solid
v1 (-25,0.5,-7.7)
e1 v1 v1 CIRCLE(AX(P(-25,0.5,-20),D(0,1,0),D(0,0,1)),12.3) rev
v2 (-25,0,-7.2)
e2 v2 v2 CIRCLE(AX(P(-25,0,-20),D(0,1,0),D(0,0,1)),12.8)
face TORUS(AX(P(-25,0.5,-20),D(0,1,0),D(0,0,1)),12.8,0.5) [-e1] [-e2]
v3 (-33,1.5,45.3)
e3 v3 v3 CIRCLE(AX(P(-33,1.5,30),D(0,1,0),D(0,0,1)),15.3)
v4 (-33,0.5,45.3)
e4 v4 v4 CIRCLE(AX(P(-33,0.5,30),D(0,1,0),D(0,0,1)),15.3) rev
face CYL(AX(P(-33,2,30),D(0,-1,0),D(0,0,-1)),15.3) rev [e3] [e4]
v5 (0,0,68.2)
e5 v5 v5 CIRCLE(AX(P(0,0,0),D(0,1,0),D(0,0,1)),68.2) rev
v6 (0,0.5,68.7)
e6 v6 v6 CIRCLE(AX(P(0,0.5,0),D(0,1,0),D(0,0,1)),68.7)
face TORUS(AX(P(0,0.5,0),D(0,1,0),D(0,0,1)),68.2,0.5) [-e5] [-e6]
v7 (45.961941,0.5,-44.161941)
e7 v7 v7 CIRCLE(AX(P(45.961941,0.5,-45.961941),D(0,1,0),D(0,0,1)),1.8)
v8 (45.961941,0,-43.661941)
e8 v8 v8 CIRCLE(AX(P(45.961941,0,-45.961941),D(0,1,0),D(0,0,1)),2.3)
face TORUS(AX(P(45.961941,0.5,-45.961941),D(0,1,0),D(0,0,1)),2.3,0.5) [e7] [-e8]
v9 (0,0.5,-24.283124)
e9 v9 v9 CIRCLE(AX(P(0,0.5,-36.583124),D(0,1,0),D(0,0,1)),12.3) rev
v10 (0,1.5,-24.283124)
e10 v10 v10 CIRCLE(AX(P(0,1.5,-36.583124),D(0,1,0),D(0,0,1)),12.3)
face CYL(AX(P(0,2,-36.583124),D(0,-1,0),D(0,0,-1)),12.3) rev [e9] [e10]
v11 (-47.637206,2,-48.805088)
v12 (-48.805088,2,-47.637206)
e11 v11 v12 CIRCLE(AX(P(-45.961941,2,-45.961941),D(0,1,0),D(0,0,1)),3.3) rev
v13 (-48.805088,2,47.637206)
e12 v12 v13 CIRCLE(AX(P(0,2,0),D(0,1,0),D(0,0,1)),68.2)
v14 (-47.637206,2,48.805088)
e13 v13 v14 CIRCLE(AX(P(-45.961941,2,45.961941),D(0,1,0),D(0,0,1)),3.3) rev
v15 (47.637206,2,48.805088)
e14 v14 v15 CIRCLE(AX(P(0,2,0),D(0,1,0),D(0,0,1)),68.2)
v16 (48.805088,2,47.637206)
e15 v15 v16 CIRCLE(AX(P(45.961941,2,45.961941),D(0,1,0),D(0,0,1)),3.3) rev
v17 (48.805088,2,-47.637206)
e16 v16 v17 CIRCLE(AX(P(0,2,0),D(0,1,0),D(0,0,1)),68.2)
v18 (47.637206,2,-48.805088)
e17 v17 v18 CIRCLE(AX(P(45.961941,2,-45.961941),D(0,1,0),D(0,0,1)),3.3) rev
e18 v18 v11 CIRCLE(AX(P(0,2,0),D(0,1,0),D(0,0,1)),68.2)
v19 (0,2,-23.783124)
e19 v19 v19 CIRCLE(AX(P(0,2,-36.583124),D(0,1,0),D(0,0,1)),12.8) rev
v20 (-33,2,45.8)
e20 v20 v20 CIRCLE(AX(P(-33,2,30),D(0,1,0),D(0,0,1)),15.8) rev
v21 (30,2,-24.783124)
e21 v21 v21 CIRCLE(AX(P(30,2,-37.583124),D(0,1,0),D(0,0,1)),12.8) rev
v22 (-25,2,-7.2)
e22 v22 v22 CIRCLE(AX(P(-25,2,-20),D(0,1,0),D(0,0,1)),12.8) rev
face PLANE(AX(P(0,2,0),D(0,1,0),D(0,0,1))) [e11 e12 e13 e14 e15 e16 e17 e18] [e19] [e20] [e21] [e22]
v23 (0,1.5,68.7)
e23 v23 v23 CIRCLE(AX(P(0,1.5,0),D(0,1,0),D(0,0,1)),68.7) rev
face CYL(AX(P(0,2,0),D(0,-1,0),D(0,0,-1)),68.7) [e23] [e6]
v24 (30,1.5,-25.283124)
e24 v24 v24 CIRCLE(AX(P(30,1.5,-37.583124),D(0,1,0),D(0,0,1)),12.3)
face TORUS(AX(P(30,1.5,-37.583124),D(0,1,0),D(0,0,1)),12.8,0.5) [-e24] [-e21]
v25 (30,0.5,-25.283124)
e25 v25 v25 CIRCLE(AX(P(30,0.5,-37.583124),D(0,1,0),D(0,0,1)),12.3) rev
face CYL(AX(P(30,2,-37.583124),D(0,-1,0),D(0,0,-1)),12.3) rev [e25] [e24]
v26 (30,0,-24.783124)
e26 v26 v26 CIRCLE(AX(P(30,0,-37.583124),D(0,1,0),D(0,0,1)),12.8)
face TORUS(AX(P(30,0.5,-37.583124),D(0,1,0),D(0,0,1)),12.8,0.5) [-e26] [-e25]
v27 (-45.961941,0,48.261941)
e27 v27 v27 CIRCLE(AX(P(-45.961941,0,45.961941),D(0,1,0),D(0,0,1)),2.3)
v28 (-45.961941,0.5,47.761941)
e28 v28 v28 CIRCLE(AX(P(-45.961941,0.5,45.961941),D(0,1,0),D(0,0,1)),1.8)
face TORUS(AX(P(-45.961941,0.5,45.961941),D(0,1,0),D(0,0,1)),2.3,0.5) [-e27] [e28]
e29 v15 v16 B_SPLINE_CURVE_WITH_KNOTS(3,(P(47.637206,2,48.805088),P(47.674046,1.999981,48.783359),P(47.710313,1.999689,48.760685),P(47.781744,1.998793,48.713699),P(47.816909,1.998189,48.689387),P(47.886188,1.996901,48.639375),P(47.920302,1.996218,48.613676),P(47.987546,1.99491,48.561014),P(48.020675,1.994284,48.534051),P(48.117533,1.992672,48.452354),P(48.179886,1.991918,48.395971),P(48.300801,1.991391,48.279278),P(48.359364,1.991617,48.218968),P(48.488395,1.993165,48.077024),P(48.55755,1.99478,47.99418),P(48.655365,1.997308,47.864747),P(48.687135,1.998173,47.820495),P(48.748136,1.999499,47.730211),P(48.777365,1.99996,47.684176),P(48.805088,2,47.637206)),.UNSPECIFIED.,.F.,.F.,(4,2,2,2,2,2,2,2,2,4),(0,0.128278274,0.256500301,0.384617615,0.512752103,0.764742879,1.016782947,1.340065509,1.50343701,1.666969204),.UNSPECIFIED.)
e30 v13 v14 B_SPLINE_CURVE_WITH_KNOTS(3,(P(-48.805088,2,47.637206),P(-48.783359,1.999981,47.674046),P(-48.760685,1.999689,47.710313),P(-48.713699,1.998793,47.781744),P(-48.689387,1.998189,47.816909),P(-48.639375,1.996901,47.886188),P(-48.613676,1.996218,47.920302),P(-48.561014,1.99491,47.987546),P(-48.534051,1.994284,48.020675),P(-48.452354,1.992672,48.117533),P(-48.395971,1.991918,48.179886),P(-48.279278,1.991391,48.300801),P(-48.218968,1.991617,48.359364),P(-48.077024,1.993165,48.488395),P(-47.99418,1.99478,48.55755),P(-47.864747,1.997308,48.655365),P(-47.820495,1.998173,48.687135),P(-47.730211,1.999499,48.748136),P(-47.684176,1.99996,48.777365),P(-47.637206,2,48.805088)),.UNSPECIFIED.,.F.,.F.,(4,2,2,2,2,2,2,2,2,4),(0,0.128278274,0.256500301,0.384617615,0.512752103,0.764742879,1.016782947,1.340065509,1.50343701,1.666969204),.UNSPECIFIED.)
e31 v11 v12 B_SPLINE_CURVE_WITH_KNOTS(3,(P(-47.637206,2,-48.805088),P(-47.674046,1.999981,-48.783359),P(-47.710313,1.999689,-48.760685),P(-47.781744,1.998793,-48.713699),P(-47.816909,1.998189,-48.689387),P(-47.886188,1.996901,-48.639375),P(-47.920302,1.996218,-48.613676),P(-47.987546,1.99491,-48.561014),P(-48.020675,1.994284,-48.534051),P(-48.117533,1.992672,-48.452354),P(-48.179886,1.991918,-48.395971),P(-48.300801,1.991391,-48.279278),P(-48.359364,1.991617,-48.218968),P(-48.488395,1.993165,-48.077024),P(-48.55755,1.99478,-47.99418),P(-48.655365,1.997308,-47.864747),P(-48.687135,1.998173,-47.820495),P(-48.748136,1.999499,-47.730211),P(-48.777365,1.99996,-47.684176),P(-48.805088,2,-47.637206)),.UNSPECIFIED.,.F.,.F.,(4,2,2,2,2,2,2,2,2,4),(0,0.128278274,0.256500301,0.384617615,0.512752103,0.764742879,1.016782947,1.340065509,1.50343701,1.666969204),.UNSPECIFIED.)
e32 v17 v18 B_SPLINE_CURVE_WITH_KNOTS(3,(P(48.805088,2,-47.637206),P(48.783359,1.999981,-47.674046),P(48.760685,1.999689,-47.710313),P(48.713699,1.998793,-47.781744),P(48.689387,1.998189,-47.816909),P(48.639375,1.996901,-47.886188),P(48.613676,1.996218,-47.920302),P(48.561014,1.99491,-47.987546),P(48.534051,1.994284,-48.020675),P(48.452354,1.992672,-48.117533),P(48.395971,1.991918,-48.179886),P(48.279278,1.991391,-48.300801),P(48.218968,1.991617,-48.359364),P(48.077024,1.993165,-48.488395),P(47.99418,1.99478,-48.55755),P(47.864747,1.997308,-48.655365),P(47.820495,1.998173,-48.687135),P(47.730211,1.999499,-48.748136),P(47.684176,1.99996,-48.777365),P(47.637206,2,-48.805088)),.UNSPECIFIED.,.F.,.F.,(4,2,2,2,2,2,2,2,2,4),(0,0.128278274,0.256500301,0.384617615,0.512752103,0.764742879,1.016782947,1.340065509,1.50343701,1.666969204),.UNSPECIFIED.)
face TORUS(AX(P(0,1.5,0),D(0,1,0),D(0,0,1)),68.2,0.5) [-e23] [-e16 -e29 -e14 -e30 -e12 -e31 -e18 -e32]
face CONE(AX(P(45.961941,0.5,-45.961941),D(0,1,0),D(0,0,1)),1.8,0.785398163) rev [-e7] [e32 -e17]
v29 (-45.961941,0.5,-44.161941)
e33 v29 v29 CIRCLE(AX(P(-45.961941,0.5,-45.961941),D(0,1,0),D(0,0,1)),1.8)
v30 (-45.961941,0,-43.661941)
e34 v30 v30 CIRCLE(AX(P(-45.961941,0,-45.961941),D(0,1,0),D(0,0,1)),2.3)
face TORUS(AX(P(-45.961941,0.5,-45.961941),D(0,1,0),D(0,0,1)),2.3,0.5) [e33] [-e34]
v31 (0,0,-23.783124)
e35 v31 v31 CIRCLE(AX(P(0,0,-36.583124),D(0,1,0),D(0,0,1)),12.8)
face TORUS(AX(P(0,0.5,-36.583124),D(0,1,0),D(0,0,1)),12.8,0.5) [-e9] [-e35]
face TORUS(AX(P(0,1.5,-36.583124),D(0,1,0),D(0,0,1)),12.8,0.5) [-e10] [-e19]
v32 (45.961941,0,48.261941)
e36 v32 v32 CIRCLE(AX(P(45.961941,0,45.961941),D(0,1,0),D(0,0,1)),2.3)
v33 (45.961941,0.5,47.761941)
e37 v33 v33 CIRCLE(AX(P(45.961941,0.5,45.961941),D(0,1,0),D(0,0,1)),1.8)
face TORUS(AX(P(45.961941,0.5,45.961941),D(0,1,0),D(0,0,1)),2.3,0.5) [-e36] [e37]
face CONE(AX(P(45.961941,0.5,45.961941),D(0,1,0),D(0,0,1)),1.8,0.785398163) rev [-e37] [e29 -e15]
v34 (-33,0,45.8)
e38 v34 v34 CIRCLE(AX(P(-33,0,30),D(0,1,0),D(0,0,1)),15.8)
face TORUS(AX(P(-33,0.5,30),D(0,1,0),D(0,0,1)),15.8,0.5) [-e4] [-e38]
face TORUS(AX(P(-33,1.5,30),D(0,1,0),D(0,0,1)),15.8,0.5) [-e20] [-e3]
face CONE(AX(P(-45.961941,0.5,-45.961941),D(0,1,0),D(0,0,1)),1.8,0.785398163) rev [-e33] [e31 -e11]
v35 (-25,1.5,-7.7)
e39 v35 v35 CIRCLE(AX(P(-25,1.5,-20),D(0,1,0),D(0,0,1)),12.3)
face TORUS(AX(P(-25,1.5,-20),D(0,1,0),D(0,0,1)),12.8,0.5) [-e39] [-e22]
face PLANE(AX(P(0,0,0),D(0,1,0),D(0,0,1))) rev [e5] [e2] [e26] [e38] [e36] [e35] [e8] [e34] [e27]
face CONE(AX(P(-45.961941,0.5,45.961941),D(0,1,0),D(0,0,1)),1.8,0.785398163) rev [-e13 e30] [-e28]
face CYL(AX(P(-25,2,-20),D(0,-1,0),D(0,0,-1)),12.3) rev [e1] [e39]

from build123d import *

# Parameters (mm, degrees)
SKETCH1_R           = 68.7
SKETCH1_R_2         = 1.8
SKETCH1_R_3         = 12.3
SKETCH1_R_4         = 15.3
BOSS_EXTRUDE1_DEPTH = 2
CHAMFER3_SIZE       = 1.5
FILLET1_R           = 0.5


with BuildPart() as part:
    # Sketch1 → Boss-Extrude1 (new body)
    with BuildSketch(Plane(origin=(0, 0, 0), x_dir=(1, 0, 0), z_dir=(0, 1, 0))):
        with Locations(Location((0, 0, 0), (0, 0, 270))):
            Circle(SKETCH1_R)
        with Locations(Location((-45.961940777, 45.961940777, 0), (0, 0, 270))):
            Circle(SKETCH1_R_2, mode=Mode.SUBTRACT)
        with Locations(Location((45.961940777, 45.961940777, 0), (0, 0, 270))):
            Circle(SKETCH1_R_2, mode=Mode.SUBTRACT)
        with Locations(Location((45.961940777, -45.961940777, 0), (0, 0, 270))):
            Circle(SKETCH1_R_2, mode=Mode.SUBTRACT)
        with Locations(Location((-45.961940777, -45.961940777, 0), (0, 0, 270))):
            Circle(SKETCH1_R_2, mode=Mode.SUBTRACT)
        with Locations(Location((-25, 20, 0), (0, 0, 270))):
            Circle(SKETCH1_R_3, mode=Mode.SUBTRACT)
        with Locations(Location((0, 36.583123952, 0), (0, 0, 270))):
            Circle(SKETCH1_R_3, mode=Mode.SUBTRACT)
        with Locations(Location((30, 37.583123952, 0), (0, 0, 270))):
            Circle(SKETCH1_R_3, mode=Mode.SUBTRACT)
        with Locations(Location((-33, -30, 0), (0, 0, 270))):
            Circle(SKETCH1_R_4, mode=Mode.SUBTRACT)
    extrude(amount=BOSS_EXTRUDE1_DEPTH)

    # Chamfer3
    chamfer3_edges = [part.edges().sort_by_distance(p)[0] for p in [
        (-45.961940777, 2, 44.161940777),
        (45.961940777, 2, 44.161940777),
        (45.961940777, 2, -47.761940777),
        (-45.961940777, 2, -47.761940777),
    ]]
    chamfer(chamfer3_edges, length=CHAMFER3_SIZE)

    # Fillet1
    # the kernel refuses this fillet: 0.5 mm, written as the material it takes off along each edge
    with BuildSketch(Plane(origin=(0, 0, 0), x_dir=(0, 0, 1), z_dir=(-1, 0, 0))) as fillet1_piece_1:
        with BuildLine():
            CenterArc((68.2001, 0.4999), FILLET1_R, 270, 90)
            Line((68.7001, 0.4999), (68.7101, 0.4999))
            ThreePointArc((68.7101, 0.4999), (68.71, 0.24995), (68.71, 0))
            Line((68.71, 0), (68.7, -0.01))
            ThreePointArc((68.7, -0.01), (68.45005, -0.01), (68.2001, -0.0101))
            Line((68.2001, -0.0101), (68.2001, -0.0001))
        make_face()
    revolve(axis=Axis((0, 0, 0), (0, 1, 0)), mode=Mode.SUBTRACT)
    with BuildSketch(Plane(origin=(-45.961940777, 0, -45.961940777), x_dir=(0, 0, 1), z_dir=(-1, 0, 0))) as fillet1_piece_2:
        with BuildLine():
            CenterArc((2.2999, 0.4999), FILLET1_R, 180, 90)
            Line((2.2999, -0.0001), (2.2999, -0.0101))
            ThreePointArc((2.2999, -0.0101), (2.04995, -0.01), (1.8, -0.01))
            Line((1.8, -0.01), (1.79, 0))
            ThreePointArc((1.79, 0), (1.79, 0.24995), (1.7899, 0.4999))
            Line((1.7899, 0.4999), (1.7999, 0.4999))
        make_face()
    revolve(axis=Axis((-45.961940777, 0, -45.961940777), (0, 1, 0)), mode=Mode.SUBTRACT)
    with BuildSketch(Plane(origin=(45.961940777, 0, -45.961940777), x_dir=(0, 0, 1), z_dir=(-1, 0, 0))) as fillet1_piece_3:
        with BuildLine():
            CenterArc((2.2999, 0.4999), FILLET1_R, 180, 90)
            Line((1.7999, 0.4999), (1.7899, 0.4999))
            ThreePointArc((1.7899, 0.4999), (1.79, 0.24995), (1.79, 0))
            Line((1.79, 0), (1.8, -0.01))
            ThreePointArc((1.8, -0.01), (2.04995, -0.01), (2.2999, -0.0101))
            Line((2.2999, -0.0101), (2.2999, -0.0001))
        make_face()
    revolve(axis=Axis((45.961940777, 0, -45.961940777), (0, 1, 0)), mode=Mode.SUBTRACT)
    with BuildSketch(Plane(origin=(45.961940777, 0, 45.961940777), x_dir=(0, 0, 1), z_dir=(-1, 0, 0))) as fillet1_piece_4:
        with BuildLine():
            CenterArc((2.2999, 0.4999), FILLET1_R, 180, 90)
            Line((1.7999, 0.4999), (1.7899, 0.4999))
            ThreePointArc((1.7899, 0.4999), (1.79, 0.24995), (1.79, 0))
            Line((1.79, 0), (1.8, -0.01))
            ThreePointArc((1.8, -0.01), (2.04995, -0.01), (2.2999, -0.0101))
            Line((2.2999, -0.0101), (2.2999, -0.0001))
        make_face()
    revolve(axis=Axis((45.961940777, 0, 45.961940777), (0, 1, 0)), mode=Mode.SUBTRACT)
    with BuildSketch(Plane(origin=(-33, 2, 30), x_dir=(0, 0, 1), z_dir=(-1, 0, 0))) as fillet1_piece_5:
        with BuildLine():
            CenterArc((15.7999, -0.4999), FILLET1_R, 90, 90)
            Line((15.2999, -0.4999), (15.2899, -0.4999))
            ThreePointArc((15.2899, -0.4999), (15.29, -0.24995), (15.29, 0))
            Line((15.29, 0), (15.3, 0.01))
            ThreePointArc((15.3, 0.01), (15.54995, 0.01), (15.7999, 0.0101))
            Line((15.7999, 0.0101), (15.7999, 0.0001))
        make_face()
    revolve(axis=Axis((-33, 2, 30), (0, 1, 0)), mode=Mode.SUBTRACT)
    with BuildSketch(Plane(origin=(-45.961940777, 0, 45.961940777), x_dir=(0, 0, 1), z_dir=(-1, 0, 0))) as fillet1_piece_6:
        with BuildLine():
            CenterArc((2.2999, 0.4999), FILLET1_R, 180, 90)
            Line((1.7999, 0.4999), (1.7899, 0.4999))
            ThreePointArc((1.7899, 0.4999), (1.79, 0.24995), (1.79, 0))
            Line((1.79, 0), (1.8, -0.01))
            ThreePointArc((1.8, -0.01), (2.04995, -0.01), (2.2999, -0.0101))
            Line((2.2999, -0.0101), (2.2999, -0.0001))
        make_face()
    revolve(axis=Axis((-45.961940777, 0, 45.961940777), (0, 1, 0)), mode=Mode.SUBTRACT)
    with BuildSketch(Plane(origin=(-25, 0, -20), x_dir=(0, 0, 1), z_dir=(-1, 0, 0))) as fillet1_piece_7:
        with BuildLine():
            CenterArc((12.7999, 0.4999), FILLET1_R, 180, 90)
            Line((12.2999, 0.4999), (12.2899, 0.4999))
            ThreePointArc((12.2899, 0.4999), (12.29, 0.24995), (12.29, 0))
            Line((12.29, 0), (12.3, -0.01))
            ThreePointArc((12.3, -0.01), (12.54995, -0.01), (12.7999, -0.0101))
            Line((12.7999, -0.0101), (12.7999, -0.0001))
        make_face()
    revolve(axis=Axis((-25, 0, -20), (0, 1, 0)), mode=Mode.SUBTRACT)
    with BuildSketch(Plane(origin=(0, 0, -36.583123952), x_dir=(0, 0, 1), z_dir=(-1, 0, 0))) as fillet1_piece_8:
        with BuildLine():
            CenterArc((12.7999, 0.4999), FILLET1_R, 180, 90)
            Line((12.2999, 0.4999), (12.2899, 0.4999))
            ThreePointArc((12.2899, 0.4999), (12.29, 0.24995), (12.29, 0))
            Line((12.29, 0), (12.3, -0.01))
            ThreePointArc((12.3, -0.01), (12.54995, -0.01), (12.7999, -0.0101))
            Line((12.7999, -0.0101), (12.7999, -0.0001))
        make_face()
    revolve(axis=Axis((0, 0, -36.583123952), (0, 1, 0)), mode=Mode.SUBTRACT)
    with BuildSketch(Plane(origin=(30, 0, -37.583123952), x_dir=(0, 0, 1), z_dir=(-1, 0, 0))) as fillet1_piece_9:
        with BuildLine():
            CenterArc((12.7999, 0.4999), FILLET1_R, 180, 90)
            Line((12.2999, 0.4999), (12.2899, 0.4999))
            ThreePointArc((12.2899, 0.4999), (12.29, 0.24995), (12.29, 0))
            Line((12.29, 0), (12.3, -0.01))
            ThreePointArc((12.3, -0.01), (12.54995, -0.01), (12.7999, -0.0101))
            Line((12.7999, -0.0101), (12.7999, -0.0001))
        make_face()
    revolve(axis=Axis((30, 0, -37.583123952), (0, 1, 0)), mode=Mode.SUBTRACT)
    with BuildSketch(Plane(origin=(-33, 0, 30), x_dir=(0, 0, 1), z_dir=(-1, 0, 0))) as fillet1_piece_10:
        with BuildLine():
            CenterArc((15.7999, 0.4999), FILLET1_R, 180, 90)
            Line((15.2999, 0.4999), (15.2899, 0.4999))
            ThreePointArc((15.2899, 0.4999), (15.29, 0.24995), (15.29, 0))
            Line((15.29, 0), (15.3, -0.01))
            ThreePointArc((15.3, -0.01), (15.54995, -0.01), (15.7999, -0.0101))
            Line((15.7999, -0.0101), (15.7999, -0.0001))
        make_face()
    revolve(axis=Axis((-33, 0, 30), (0, 1, 0)), mode=Mode.SUBTRACT)
    with BuildSketch(Plane(origin=(30, 2, -37.583123952), x_dir=(0, 0, 1), z_dir=(-1, 0, 0))) as fillet1_piece_11:
        with BuildLine():
            CenterArc((12.7999, -0.4999), FILLET1_R, 90, 90)
            Line((12.2999, -0.4999), (12.2899, -0.4999))
            ThreePointArc((12.2899, -0.4999), (12.29, -0.24995), (12.29, 0))
            Line((12.29, 0), (12.3, 0.01))
            ThreePointArc((12.3, 0.01), (12.54995, 0.01), (12.7999, 0.0101))
            Line((12.7999, 0.0101), (12.7999, 0.0001))
        make_face()
    revolve(axis=Axis((30, 2, -37.583123952), (0, 1, 0)), mode=Mode.SUBTRACT)
    with BuildSketch(Plane(origin=(0, 2, -36.583123952), x_dir=(0, 0, 1), z_dir=(-1, 0, 0))) as fillet1_piece_12:
        with BuildLine():
            CenterArc((12.7999, -0.4999), FILLET1_R, 90, 90)
            Line((12.2999, -0.4999), (12.2899, -0.4999))
            ThreePointArc((12.2899, -0.4999), (12.29, -0.24995), (12.29, 0))
            Line((12.29, 0), (12.3, 0.01))
            ThreePointArc((12.3, 0.01), (12.54995, 0.01), (12.7999, 0.0101))
            Line((12.7999, 0.0101), (12.7999, 0.0001))
        make_face()
    revolve(axis=Axis((0, 2, -36.583123952), (0, 1, 0)), mode=Mode.SUBTRACT)
    with BuildSketch(Plane(origin=(-25, 2, -20), x_dir=(0, 0, 1), z_dir=(-1, 0, 0))) as fillet1_piece_13:
        with BuildLine():
            CenterArc((12.7999, -0.4999), FILLET1_R, 90, 90)
            Line((12.2999, -0.4999), (12.2899, -0.4999))
            ThreePointArc((12.2899, -0.4999), (12.29, -0.24995), (12.29, 0))
            Line((12.29, 0), (12.3, 0.01))
            ThreePointArc((12.3, 0.01), (12.54995, 0.01), (12.7999, 0.0101))
            Line((12.7999, 0.0101), (12.7999, 0.0001))
        make_face()
    revolve(axis=Axis((-25, 2, -20), (0, 1, 0)), mode=Mode.SUBTRACT)
    with BuildSketch(Plane(origin=(0, 2, 0), x_dir=(0, 0, 1), z_dir=(-1, 0, 0))) as fillet1_piece_14:
        with BuildLine():
            CenterArc((68.2001, -0.4999), FILLET1_R, 0, 90)
            Line((68.7001, -0.4999), (68.7101, -0.4999))
            ThreePointArc((68.7101, -0.4999), (68.71, -0.24995), (68.71, 0))
            Line((68.71, 0), (68.7, 0.01))
            ThreePointArc((68.7, 0.01), (68.45005, 0.01), (68.2001, 0.0101))
            Line((68.2001, 0.0101), (68.2001, 0.0001))
        make_face()
    revolve(axis=Axis((0, 2, 0), (0, 1, 0)), mode=Mode.SUBTRACT)


solid = part.part
